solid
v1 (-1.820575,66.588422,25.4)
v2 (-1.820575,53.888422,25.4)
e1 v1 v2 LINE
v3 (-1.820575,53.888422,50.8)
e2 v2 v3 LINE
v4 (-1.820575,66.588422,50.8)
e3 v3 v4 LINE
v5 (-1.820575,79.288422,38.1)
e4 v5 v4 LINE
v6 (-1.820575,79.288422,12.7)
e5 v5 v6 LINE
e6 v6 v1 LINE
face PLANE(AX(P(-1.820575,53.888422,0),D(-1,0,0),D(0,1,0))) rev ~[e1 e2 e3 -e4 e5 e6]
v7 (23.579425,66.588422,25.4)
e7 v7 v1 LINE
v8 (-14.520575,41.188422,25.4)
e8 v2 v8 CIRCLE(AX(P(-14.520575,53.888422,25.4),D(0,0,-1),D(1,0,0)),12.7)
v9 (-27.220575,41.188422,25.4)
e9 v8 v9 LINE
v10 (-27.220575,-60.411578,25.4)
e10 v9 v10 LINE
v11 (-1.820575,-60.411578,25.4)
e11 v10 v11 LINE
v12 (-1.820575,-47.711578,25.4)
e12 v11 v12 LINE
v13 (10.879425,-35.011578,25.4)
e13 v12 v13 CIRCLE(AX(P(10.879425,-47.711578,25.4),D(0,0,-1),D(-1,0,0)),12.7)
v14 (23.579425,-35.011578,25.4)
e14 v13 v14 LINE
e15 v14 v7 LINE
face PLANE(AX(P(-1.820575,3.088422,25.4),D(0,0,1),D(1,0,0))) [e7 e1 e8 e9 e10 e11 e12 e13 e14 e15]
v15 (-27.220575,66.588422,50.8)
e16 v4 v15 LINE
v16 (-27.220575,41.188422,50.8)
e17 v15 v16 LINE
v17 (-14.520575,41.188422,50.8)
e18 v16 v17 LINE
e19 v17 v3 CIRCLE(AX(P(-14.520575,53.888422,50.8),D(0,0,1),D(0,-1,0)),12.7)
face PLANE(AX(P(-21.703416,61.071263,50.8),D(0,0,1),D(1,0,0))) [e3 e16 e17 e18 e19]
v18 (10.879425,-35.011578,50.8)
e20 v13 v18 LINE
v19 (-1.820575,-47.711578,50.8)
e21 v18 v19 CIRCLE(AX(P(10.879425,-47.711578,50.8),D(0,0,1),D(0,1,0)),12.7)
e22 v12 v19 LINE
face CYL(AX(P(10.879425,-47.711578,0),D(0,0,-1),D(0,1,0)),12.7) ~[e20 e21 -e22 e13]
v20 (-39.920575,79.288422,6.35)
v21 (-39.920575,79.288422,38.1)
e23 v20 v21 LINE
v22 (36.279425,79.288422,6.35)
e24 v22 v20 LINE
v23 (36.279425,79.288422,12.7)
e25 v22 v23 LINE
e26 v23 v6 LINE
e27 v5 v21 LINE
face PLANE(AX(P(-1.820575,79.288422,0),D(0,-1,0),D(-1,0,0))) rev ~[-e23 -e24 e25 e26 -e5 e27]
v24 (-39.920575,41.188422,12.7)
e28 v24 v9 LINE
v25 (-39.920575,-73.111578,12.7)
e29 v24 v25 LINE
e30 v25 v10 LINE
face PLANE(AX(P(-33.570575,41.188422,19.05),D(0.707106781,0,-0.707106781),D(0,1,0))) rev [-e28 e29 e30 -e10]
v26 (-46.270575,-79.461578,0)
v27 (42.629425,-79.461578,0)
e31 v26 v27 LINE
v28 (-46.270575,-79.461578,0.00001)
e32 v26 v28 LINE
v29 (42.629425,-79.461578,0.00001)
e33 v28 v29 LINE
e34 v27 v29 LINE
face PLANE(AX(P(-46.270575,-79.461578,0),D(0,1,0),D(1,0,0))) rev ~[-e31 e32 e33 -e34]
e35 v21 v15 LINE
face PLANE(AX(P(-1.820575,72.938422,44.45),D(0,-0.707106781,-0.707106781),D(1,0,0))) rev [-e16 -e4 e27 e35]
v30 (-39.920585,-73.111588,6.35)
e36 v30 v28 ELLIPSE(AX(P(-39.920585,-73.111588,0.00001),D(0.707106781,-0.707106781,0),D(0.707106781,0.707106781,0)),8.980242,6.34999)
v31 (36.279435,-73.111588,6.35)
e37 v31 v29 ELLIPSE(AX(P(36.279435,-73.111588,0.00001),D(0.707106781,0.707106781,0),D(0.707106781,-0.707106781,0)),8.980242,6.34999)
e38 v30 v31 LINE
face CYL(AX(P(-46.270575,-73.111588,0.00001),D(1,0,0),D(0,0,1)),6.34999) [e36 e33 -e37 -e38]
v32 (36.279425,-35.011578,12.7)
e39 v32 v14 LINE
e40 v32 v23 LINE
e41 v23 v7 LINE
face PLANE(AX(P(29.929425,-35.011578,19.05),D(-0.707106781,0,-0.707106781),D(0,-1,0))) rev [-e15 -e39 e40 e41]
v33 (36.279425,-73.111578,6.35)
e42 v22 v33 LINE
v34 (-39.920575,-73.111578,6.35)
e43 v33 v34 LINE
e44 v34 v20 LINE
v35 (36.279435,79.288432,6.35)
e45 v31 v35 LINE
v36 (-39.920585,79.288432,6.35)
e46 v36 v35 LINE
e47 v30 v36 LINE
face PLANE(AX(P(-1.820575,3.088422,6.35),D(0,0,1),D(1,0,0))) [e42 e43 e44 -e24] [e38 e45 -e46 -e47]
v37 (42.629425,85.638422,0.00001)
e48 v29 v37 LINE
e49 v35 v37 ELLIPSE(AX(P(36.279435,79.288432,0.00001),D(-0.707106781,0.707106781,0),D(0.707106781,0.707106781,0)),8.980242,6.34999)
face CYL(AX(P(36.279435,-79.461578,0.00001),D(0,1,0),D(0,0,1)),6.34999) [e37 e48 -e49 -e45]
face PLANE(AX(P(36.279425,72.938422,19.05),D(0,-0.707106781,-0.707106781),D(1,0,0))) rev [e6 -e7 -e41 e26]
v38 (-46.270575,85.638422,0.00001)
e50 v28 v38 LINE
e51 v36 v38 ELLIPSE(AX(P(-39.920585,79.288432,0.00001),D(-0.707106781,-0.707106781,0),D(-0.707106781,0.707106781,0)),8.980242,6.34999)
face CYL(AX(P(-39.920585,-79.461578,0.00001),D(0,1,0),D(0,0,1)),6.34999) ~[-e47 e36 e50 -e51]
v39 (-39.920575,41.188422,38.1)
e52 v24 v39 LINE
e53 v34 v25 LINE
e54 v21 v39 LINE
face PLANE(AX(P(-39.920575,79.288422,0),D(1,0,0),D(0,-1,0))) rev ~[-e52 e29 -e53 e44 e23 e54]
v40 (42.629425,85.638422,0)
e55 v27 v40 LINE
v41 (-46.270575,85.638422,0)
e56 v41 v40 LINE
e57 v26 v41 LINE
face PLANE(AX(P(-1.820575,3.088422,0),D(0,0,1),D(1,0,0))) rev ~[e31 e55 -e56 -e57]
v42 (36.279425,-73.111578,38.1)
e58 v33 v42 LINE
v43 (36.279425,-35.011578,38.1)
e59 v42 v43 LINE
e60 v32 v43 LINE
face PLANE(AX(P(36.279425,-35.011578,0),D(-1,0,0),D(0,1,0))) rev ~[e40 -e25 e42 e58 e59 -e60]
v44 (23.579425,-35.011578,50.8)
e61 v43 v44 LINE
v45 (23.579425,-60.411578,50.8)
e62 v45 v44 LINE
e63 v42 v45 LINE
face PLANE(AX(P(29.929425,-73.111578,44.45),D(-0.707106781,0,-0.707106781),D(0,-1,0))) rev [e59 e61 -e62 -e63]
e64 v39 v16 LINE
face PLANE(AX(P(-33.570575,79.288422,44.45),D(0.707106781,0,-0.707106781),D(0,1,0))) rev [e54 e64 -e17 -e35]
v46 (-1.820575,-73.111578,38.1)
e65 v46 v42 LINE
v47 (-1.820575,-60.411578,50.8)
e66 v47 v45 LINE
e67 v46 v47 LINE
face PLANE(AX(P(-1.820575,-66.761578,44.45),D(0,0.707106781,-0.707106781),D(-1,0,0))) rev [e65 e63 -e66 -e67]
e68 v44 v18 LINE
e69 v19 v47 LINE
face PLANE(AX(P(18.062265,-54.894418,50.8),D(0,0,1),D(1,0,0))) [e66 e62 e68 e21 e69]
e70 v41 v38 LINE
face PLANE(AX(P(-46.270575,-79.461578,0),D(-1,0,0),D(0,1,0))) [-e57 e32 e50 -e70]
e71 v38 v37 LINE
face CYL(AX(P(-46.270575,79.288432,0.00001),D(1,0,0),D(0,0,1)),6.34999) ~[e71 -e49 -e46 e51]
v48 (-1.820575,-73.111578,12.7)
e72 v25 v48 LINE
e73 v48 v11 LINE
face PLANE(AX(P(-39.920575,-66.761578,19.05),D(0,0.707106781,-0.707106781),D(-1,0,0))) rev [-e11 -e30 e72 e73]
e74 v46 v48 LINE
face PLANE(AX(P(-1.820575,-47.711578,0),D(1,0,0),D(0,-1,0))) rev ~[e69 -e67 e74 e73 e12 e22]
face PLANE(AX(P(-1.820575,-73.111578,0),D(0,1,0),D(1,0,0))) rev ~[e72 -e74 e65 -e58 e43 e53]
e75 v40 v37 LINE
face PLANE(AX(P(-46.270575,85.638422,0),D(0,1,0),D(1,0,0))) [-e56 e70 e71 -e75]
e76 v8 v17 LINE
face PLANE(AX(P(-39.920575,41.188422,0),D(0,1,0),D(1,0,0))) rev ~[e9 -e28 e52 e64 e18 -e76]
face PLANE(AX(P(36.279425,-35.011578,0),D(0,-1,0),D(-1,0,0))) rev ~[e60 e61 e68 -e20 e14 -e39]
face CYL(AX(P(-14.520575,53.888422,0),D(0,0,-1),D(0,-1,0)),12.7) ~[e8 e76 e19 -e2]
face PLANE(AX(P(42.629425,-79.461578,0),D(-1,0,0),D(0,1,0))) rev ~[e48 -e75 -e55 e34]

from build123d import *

# Parameters (mm, degrees)
F0_W     = 88.9
F0_H     = 165.1
F1_DEPTH = 6.35
F2_DEPTH = 25.4
F3_DEPTH = 50.8
F4_R     = 6.34999
F5_SIZE  = 12.7


# Not quite as in the source:
# - a fillet or chamfer is up to 0.001 mm smaller than in the source, because OpenCascade refuses the exact size


with BuildPart() as f1:
    # F0 (on Top) → F1 (new body)
    with BuildSketch(Plane.XY):
        with Locations((-1.8205753744, 3.0884221945)):
            Rectangle(F0_W, F0_H)
        Polygon((-39.9205753744, 41.1884221945), (-39.9205753744, 79.2884221945), (-1.8205753744, 79.2884221945), (36.2794246256, 79.2884221945), (36.2794246256, -35.0115778055), (36.2794246256, -73.1115778055), (-1.8205753744, -73.1115778055), (-39.9205753744, -73.1115778055), align=None, mode=Mode.SUBTRACT)
    extrude(amount=F1_DEPTH)

    # F0 (on Top) → F2 (join)
    with BuildSketch(Plane.XY):
        with BuildLine():
            Line((36.2794246256, 79.2884221945), (-1.8205753744, 79.2884221945))
            Line((-1.8205753744, 79.2884221945), (-1.8205753744, 53.8884221945))
            ThreePointArc((-1.8205753744, 53.8884221945), (-5.5403192533, 44.9081660734), (-14.5205753744, 41.1884221945))
            Line((-14.5205753744, 41.1884221945), (-39.9205753744, 41.1884221945))
            Line((-39.9205753744, 41.1884221945), (-39.9205753744, -73.1115778055))
            Line((-39.9205753744, -73.1115778055), (-1.8205753744, -73.1115778055))
            Line((-1.8205753744, -73.1115778055), (-1.8205753744, -47.7115778055))
            ThreePointArc((-1.8205753744, -47.7115778055), (1.8991685046, -38.7313216844), (10.8794246256, -35.0115778055))
            Line((10.8794246256, -35.0115778055), (36.2794246256, -35.0115778055))
            Line((36.2794246256, -35.0115778055), (36.2794246256, 79.2884221945))
        make_face()
    extrude(amount=F2_DEPTH)

    # F0 (on Top) → F3 (join)
    with BuildSketch(Plane.XY):
        with BuildLine():
            Line((-1.8205753744, 79.2884221945), (-39.9205753744, 79.2884221945))
            Line((-39.9205753744, 79.2884221945), (-39.9205753744, 41.1884221945))
            Line((-39.9205753744, 41.1884221945), (-14.5205753744, 41.1884221945))
            ThreePointArc((-14.5205753744, 41.1884221945), (-5.5403192533, 44.9081660734), (-1.8205753744, 53.8884221945))
            Line((-1.8205753744, 53.8884221945), (-1.8205753744, 79.2884221945))
        make_face()
        with BuildLine():
            Line((36.2794246256, -73.1115778055), (36.2794246256, -35.0115778055))
            Line((36.2794246256, -35.0115778055), (10.8794246256, -35.0115778055))
            ThreePointArc((10.8794246256, -35.0115778055), (1.8991685046, -38.7313216844), (-1.8205753744, -47.7115778055))
            Line((-1.8205753744, -47.7115778055), (-1.8205753744, -73.1115778055))
            Line((-1.8205753744, -73.1115778055), (36.2794246256, -73.1115778055))
        make_face()
    extrude(amount=F3_DEPTH)

    # F4 (radius 6.35 in the source; OpenCascade refuses exactly that, so slightly less here)
    f4_edges = [f1.edges().sort_by_distance(p)[0] for p in [
        (-46.270575, 3.088422, 6.35),
        (-1.820575, -79.461578, 6.35),
        (42.629425, 3.088422, 6.35),
        (-1.820575, 85.638422, 6.35),
    ]]
    fillet(f4_edges, radius=F4_R)

    # F5
    f5_edges = [f1.edges().sort_by_distance(p)[0] for p in [
        (17.229425, -73.111578, 50.8),
        (36.279425, -54.061578, 50.8),
        (-39.920575, 60.238422, 50.8),
        (-20.870575, 79.288422, 50.8),
        (-39.920575, -15.961578, 25.4),
        (-20.870575, -73.111578, 25.4),
        (36.279425, 22.138422, 25.4),
        (17.229425, 79.288422, 25.4),
    ]]
    chamfer(f5_edges, length=F5_SIZE)


solid = f1.part
